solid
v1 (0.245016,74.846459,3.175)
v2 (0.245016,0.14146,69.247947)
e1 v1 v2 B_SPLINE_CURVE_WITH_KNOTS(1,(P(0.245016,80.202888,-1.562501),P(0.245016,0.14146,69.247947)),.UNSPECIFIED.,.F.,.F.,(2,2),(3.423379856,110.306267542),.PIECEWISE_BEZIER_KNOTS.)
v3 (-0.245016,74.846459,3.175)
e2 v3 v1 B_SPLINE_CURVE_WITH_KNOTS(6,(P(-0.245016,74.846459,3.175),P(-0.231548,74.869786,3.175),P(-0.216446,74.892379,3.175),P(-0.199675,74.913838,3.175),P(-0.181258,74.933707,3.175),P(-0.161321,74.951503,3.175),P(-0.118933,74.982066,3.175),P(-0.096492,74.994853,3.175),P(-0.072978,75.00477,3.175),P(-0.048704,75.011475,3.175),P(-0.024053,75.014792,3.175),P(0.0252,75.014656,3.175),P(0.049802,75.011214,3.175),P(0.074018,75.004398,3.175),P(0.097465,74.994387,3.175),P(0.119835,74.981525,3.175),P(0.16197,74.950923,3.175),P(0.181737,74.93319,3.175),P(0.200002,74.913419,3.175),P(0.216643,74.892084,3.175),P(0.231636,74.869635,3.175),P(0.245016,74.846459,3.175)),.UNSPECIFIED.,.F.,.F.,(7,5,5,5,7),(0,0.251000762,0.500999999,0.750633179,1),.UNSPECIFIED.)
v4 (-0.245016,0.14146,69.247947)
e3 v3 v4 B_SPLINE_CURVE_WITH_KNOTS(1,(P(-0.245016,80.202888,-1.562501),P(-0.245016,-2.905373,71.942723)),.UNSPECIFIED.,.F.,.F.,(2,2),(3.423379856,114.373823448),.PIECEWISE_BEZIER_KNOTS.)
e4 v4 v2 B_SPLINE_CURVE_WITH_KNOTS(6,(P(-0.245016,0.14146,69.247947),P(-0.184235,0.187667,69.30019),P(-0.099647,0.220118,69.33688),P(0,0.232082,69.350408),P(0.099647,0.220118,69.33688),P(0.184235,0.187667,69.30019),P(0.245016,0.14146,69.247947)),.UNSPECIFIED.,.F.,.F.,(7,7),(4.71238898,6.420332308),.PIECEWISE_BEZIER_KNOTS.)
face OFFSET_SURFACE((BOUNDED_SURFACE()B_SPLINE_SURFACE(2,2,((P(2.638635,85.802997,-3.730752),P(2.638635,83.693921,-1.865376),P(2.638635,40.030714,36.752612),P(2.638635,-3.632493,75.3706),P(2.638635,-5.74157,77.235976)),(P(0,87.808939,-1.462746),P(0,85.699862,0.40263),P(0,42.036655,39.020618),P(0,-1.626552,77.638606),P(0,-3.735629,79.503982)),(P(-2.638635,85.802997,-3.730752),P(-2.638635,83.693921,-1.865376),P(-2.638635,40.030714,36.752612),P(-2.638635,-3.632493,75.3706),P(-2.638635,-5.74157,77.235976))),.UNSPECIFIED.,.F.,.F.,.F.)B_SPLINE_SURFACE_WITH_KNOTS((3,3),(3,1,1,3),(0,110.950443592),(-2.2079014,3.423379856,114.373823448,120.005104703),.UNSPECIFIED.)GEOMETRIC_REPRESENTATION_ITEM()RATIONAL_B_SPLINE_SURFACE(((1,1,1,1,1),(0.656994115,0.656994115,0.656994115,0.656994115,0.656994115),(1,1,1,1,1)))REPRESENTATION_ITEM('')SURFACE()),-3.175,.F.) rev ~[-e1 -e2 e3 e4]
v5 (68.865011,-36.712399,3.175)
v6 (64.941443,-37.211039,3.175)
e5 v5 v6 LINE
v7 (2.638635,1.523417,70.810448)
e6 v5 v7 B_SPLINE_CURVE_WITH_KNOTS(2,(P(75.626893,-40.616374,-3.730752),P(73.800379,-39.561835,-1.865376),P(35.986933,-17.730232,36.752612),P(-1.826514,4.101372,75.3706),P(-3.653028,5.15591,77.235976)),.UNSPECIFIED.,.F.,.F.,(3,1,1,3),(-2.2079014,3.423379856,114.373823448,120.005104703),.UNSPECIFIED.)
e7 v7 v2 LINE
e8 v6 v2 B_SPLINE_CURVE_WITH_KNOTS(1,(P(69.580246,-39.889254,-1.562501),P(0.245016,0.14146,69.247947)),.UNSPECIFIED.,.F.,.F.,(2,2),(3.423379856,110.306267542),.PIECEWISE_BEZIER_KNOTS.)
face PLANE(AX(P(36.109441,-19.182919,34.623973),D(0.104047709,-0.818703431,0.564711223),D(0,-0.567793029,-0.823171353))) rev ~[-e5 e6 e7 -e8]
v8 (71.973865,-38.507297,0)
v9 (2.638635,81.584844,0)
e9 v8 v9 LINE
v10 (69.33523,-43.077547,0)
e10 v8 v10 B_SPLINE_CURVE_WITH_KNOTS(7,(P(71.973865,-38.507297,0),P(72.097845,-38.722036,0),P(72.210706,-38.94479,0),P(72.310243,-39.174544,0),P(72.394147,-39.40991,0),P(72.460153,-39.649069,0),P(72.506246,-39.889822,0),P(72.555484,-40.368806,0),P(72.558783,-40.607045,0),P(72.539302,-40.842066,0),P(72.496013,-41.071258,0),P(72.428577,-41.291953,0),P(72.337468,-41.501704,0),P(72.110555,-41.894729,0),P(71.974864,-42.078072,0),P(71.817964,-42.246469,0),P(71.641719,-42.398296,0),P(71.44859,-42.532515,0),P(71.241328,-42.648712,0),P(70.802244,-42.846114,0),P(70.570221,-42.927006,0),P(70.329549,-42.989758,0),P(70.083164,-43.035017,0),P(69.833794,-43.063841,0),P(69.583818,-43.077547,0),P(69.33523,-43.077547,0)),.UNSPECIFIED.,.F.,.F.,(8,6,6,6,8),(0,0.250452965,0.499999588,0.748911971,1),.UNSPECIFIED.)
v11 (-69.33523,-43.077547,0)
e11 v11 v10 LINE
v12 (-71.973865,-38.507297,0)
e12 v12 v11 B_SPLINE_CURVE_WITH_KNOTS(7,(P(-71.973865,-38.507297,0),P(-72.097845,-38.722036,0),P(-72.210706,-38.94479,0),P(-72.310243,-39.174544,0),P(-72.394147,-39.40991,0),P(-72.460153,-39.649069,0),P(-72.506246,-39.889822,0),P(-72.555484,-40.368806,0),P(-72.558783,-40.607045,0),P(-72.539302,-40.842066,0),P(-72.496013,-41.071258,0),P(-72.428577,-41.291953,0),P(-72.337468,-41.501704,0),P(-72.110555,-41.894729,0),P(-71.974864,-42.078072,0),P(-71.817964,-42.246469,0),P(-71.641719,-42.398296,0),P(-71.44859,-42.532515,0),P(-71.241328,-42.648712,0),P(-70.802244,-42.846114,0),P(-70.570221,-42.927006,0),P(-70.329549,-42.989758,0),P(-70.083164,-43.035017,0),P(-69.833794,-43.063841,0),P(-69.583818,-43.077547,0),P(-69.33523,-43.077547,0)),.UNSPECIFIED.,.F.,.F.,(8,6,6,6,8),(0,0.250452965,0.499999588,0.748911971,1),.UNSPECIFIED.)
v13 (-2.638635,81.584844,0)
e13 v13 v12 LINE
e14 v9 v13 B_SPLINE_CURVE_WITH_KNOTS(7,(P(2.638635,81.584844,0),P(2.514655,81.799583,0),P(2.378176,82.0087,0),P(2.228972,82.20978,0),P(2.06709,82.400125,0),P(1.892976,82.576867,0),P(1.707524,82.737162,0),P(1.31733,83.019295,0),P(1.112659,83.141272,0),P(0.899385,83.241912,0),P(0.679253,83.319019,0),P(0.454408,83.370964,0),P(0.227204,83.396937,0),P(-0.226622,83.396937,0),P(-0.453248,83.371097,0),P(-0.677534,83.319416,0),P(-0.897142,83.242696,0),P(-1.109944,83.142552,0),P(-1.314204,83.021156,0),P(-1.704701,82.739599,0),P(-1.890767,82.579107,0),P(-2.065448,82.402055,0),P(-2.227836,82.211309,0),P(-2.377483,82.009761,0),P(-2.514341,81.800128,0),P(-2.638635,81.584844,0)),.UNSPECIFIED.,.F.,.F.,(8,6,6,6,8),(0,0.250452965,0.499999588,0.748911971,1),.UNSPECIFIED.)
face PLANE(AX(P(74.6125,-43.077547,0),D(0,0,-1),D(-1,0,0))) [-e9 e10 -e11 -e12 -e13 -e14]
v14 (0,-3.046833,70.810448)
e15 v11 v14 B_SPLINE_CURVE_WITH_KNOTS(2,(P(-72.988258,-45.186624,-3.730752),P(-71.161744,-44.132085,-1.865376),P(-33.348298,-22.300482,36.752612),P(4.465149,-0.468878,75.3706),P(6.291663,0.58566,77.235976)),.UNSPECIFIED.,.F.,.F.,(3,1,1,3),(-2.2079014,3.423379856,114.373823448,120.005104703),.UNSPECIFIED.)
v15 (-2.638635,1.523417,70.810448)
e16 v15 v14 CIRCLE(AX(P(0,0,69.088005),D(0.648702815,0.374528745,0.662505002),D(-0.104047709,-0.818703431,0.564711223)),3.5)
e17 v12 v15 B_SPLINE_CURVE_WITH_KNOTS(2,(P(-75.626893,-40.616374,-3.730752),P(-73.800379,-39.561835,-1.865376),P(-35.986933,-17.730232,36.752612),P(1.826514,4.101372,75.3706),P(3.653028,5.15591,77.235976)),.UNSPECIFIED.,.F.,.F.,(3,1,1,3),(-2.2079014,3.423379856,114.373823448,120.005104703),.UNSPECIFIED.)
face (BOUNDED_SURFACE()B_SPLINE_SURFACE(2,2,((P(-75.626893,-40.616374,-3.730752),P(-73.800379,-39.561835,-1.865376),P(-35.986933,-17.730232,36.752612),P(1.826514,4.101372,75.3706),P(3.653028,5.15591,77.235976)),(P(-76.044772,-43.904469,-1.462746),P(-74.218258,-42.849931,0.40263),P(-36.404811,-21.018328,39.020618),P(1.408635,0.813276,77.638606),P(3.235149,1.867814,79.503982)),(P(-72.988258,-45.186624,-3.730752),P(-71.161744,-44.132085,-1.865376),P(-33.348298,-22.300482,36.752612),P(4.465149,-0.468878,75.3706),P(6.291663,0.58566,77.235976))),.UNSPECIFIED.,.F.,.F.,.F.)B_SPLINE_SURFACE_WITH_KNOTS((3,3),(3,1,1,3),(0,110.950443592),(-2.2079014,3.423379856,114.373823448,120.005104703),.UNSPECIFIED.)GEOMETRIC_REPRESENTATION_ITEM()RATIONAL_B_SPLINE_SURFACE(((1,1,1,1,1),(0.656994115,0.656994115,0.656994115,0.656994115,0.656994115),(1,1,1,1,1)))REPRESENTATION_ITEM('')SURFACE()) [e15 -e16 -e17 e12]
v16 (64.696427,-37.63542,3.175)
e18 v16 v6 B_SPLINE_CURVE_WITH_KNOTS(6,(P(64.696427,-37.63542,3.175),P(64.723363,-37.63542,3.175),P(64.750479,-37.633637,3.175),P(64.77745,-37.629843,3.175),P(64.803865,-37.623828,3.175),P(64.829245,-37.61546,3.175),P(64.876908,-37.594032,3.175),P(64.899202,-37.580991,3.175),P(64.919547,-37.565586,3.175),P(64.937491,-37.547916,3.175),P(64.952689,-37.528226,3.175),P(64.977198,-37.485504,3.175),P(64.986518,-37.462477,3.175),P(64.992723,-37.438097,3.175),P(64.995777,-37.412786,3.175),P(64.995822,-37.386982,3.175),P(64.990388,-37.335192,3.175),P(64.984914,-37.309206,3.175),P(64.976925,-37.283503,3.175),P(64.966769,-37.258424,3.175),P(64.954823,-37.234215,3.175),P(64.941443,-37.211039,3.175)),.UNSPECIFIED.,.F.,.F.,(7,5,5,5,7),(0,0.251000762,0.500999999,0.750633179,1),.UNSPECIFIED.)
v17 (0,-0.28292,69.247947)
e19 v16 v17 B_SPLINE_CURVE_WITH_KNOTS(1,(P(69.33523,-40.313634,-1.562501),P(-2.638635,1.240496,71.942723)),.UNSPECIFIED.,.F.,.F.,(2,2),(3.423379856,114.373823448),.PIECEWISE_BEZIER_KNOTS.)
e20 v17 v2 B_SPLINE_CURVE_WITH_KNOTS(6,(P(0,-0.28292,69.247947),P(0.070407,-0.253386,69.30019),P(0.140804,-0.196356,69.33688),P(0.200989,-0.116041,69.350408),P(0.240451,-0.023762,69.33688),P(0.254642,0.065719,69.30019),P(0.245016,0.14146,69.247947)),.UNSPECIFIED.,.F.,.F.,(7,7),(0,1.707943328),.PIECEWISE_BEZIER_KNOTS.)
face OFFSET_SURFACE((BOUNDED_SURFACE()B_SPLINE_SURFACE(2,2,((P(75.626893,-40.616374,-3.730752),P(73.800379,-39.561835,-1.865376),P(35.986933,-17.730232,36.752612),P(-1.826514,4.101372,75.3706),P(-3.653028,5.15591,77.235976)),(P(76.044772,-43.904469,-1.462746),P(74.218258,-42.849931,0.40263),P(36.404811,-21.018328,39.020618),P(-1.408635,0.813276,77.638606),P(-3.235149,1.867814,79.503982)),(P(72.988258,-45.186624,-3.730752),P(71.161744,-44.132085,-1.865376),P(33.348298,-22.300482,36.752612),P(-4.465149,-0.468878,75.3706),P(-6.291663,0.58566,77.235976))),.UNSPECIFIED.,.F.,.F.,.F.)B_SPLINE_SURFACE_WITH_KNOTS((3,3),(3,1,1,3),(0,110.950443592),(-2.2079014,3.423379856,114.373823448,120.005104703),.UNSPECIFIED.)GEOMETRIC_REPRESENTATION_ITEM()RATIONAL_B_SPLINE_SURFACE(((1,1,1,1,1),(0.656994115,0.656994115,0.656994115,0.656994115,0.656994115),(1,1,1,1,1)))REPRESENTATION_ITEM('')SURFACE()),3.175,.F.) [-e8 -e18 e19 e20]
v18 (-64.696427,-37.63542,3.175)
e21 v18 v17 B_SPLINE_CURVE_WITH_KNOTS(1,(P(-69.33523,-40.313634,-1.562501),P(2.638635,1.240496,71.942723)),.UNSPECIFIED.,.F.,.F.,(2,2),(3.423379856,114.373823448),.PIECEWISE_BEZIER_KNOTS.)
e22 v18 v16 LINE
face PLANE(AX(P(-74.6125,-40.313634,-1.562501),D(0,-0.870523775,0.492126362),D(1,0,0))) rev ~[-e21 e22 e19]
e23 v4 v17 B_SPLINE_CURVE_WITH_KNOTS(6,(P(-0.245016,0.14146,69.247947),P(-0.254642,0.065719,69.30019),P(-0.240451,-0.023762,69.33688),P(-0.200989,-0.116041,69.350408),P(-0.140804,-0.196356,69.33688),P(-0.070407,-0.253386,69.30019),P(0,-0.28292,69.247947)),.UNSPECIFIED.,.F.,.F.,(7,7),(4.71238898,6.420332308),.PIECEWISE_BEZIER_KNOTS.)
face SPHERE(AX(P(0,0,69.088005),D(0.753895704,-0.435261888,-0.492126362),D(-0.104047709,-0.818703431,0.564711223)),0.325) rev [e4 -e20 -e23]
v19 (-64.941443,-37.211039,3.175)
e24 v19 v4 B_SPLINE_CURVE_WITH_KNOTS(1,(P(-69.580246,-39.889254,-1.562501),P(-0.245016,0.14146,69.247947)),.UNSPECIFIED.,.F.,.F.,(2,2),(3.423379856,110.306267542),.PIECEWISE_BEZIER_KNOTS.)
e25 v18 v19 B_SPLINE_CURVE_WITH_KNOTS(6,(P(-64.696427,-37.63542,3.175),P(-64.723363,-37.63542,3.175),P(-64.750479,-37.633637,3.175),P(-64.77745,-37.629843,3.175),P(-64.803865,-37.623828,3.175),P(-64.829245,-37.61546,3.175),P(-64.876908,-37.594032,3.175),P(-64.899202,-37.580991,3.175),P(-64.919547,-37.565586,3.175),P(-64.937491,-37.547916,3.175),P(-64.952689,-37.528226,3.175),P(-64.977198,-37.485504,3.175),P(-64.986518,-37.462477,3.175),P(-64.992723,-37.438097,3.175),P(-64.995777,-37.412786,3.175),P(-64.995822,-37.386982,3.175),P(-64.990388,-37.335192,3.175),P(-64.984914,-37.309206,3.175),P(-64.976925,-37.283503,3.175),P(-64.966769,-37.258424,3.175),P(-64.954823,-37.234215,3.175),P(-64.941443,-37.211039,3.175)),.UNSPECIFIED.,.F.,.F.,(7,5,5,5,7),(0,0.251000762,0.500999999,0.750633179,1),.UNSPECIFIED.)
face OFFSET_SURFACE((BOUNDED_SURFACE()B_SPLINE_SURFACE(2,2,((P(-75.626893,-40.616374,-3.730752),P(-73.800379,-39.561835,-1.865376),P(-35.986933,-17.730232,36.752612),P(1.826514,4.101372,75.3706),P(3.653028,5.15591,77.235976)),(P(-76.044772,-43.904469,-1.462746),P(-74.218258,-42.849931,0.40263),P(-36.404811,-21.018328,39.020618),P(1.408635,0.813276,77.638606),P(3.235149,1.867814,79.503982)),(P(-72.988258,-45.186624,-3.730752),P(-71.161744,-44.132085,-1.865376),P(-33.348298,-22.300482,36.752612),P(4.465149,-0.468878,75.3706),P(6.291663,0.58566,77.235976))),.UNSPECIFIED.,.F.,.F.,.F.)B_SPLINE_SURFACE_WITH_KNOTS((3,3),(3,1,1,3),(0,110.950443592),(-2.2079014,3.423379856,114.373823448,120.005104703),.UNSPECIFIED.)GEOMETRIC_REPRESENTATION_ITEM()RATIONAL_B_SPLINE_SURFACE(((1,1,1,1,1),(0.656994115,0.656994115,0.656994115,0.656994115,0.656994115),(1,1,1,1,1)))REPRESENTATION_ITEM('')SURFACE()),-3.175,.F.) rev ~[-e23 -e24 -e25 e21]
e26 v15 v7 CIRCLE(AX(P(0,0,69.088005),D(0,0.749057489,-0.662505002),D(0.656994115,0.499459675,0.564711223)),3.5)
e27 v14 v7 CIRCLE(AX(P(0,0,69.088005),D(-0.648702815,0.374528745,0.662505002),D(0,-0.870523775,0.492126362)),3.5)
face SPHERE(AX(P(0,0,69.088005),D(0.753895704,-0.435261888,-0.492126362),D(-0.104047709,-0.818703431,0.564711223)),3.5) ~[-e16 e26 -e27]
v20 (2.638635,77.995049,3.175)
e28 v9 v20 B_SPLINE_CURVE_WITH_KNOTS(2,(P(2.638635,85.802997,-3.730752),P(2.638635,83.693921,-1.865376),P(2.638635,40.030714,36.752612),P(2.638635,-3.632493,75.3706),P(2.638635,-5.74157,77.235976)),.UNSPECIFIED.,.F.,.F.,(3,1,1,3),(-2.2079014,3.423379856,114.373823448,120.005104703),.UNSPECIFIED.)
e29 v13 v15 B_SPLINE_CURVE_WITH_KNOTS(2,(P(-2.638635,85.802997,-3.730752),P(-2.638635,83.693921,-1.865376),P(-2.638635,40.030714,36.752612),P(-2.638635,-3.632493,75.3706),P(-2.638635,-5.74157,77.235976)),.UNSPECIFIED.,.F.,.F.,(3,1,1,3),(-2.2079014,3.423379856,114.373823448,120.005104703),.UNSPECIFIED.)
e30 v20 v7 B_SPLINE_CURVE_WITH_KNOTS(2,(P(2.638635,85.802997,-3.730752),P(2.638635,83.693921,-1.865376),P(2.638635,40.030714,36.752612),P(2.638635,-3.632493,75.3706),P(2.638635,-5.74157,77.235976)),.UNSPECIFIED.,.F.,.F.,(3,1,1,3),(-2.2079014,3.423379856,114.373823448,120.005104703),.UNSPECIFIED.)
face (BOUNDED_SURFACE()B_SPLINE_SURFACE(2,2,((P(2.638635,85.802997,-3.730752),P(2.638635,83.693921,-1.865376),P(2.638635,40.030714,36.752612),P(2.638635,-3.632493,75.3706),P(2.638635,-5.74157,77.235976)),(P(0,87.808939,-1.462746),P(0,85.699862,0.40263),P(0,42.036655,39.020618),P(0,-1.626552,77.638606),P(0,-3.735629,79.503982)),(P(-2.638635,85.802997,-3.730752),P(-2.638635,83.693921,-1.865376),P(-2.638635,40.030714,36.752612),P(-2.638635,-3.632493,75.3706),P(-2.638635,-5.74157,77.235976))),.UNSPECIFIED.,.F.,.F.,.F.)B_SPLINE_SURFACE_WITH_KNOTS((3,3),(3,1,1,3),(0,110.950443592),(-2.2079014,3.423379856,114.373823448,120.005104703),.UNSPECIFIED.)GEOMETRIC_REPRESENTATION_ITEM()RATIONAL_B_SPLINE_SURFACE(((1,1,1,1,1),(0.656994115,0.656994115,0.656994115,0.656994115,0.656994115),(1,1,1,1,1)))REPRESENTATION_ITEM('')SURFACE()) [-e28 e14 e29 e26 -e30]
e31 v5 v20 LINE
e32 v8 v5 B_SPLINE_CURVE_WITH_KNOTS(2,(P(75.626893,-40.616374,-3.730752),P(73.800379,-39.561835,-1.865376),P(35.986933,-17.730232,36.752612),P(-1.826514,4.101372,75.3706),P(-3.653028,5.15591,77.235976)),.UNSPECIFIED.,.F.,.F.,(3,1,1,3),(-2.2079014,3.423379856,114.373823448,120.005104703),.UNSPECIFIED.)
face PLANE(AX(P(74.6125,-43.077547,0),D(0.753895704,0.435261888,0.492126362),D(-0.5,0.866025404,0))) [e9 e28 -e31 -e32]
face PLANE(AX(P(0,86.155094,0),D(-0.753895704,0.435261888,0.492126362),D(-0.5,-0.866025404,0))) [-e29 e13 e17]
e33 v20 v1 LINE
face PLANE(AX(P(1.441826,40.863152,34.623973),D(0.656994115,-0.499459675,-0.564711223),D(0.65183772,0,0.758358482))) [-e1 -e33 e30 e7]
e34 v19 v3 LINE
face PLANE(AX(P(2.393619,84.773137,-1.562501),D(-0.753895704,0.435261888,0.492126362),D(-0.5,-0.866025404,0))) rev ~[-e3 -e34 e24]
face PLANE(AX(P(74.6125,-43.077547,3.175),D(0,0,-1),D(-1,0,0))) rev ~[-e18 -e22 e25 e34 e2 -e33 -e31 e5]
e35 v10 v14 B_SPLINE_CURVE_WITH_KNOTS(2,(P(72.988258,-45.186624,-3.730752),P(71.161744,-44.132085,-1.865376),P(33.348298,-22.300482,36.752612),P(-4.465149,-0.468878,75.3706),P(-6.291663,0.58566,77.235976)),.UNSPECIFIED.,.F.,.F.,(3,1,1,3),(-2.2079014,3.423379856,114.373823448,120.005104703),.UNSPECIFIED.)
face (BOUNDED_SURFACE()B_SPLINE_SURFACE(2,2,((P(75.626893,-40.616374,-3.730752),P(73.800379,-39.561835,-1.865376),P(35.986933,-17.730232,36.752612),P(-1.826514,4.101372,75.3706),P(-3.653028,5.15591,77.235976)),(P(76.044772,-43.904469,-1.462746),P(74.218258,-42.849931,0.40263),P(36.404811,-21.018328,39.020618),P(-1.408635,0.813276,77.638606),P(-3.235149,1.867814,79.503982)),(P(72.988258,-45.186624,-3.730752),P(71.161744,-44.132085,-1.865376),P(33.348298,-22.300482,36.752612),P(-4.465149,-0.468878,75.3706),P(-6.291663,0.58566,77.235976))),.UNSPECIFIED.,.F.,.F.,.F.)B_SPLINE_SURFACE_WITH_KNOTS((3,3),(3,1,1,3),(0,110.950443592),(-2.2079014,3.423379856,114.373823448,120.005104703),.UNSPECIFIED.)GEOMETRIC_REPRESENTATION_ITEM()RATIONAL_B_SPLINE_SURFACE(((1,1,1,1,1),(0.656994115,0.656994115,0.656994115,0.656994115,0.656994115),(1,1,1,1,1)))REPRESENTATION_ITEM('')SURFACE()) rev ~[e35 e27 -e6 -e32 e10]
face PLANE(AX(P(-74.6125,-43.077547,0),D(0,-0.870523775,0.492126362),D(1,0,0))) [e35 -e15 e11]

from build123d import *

# Parameters (mm, degrees)
F4_R = 3.5
F5_T = 3.175


# Not quite as in the source:
# - a shell that OpenCascade refuses in one call is made with other operations: the cavity is built on its own and cut out


with BuildPart() as f3:
    # F0 (on Top) → F3 section 0
    with BuildSketch(Plane.XY, mode=Mode.PRIVATE) as f3_s0:
        Polygon((74.6125, -43.0775469599), (0, 86.1550939198), (-74.6125, -43.0775469599), align=None)
    loft([f3_s0.sketch, Vertex(0, 0, 76.2)])

    # F4
    f4_edges = [f3.edges().sort_by_distance(p)[0] for p in [
        (37.30625, -21.538773, 38.1),
        (-37.30625, -21.538773, 38.1),
        (0, 43.077547, 38.1),
    ]]
    fillet(f4_edges, radius=F4_R)

    # F5: shell of thickness 3.175, made by hand


with BuildPart() as f5_core1:
    # F5_t2: copy of F3
    add(f3.part)

    # the walls: a layer under each face that stays
    f5_faces = [f5_core1.faces().sort_by_distance(p)[0] for p in [
        (0, -23.0621900868, 35.4052238664),
        (17.458808121, -10.0798475684, 0),
        (-37.1159888559, -21.4289261572, 35.8548532751),
        (37.1159888559, -21.4289261572, 35.8548532751),
        (-19.9724424821, 11.5310950434, 35.4052238664),
        (0, 42.8578523144, 35.8548532751),
        (-0.5010139072, 0.2892605142, 72.5398619822),
    ]]
    thicken(f5_faces, amount=-F5_T, mode=Mode.SUBTRACT)


with BuildPart() as f3_1:
    add(f3.part)

    # what is left inside the walls is the cavity
    f5_cavity = [f5_core1.part.solids().sort_by_distance(p)[0] for p in [
        (1.753709, 1.221373, 3.20675),
    ]]
    add(f5_cavity, mode=Mode.SUBTRACT)


solid = f3_1.part
